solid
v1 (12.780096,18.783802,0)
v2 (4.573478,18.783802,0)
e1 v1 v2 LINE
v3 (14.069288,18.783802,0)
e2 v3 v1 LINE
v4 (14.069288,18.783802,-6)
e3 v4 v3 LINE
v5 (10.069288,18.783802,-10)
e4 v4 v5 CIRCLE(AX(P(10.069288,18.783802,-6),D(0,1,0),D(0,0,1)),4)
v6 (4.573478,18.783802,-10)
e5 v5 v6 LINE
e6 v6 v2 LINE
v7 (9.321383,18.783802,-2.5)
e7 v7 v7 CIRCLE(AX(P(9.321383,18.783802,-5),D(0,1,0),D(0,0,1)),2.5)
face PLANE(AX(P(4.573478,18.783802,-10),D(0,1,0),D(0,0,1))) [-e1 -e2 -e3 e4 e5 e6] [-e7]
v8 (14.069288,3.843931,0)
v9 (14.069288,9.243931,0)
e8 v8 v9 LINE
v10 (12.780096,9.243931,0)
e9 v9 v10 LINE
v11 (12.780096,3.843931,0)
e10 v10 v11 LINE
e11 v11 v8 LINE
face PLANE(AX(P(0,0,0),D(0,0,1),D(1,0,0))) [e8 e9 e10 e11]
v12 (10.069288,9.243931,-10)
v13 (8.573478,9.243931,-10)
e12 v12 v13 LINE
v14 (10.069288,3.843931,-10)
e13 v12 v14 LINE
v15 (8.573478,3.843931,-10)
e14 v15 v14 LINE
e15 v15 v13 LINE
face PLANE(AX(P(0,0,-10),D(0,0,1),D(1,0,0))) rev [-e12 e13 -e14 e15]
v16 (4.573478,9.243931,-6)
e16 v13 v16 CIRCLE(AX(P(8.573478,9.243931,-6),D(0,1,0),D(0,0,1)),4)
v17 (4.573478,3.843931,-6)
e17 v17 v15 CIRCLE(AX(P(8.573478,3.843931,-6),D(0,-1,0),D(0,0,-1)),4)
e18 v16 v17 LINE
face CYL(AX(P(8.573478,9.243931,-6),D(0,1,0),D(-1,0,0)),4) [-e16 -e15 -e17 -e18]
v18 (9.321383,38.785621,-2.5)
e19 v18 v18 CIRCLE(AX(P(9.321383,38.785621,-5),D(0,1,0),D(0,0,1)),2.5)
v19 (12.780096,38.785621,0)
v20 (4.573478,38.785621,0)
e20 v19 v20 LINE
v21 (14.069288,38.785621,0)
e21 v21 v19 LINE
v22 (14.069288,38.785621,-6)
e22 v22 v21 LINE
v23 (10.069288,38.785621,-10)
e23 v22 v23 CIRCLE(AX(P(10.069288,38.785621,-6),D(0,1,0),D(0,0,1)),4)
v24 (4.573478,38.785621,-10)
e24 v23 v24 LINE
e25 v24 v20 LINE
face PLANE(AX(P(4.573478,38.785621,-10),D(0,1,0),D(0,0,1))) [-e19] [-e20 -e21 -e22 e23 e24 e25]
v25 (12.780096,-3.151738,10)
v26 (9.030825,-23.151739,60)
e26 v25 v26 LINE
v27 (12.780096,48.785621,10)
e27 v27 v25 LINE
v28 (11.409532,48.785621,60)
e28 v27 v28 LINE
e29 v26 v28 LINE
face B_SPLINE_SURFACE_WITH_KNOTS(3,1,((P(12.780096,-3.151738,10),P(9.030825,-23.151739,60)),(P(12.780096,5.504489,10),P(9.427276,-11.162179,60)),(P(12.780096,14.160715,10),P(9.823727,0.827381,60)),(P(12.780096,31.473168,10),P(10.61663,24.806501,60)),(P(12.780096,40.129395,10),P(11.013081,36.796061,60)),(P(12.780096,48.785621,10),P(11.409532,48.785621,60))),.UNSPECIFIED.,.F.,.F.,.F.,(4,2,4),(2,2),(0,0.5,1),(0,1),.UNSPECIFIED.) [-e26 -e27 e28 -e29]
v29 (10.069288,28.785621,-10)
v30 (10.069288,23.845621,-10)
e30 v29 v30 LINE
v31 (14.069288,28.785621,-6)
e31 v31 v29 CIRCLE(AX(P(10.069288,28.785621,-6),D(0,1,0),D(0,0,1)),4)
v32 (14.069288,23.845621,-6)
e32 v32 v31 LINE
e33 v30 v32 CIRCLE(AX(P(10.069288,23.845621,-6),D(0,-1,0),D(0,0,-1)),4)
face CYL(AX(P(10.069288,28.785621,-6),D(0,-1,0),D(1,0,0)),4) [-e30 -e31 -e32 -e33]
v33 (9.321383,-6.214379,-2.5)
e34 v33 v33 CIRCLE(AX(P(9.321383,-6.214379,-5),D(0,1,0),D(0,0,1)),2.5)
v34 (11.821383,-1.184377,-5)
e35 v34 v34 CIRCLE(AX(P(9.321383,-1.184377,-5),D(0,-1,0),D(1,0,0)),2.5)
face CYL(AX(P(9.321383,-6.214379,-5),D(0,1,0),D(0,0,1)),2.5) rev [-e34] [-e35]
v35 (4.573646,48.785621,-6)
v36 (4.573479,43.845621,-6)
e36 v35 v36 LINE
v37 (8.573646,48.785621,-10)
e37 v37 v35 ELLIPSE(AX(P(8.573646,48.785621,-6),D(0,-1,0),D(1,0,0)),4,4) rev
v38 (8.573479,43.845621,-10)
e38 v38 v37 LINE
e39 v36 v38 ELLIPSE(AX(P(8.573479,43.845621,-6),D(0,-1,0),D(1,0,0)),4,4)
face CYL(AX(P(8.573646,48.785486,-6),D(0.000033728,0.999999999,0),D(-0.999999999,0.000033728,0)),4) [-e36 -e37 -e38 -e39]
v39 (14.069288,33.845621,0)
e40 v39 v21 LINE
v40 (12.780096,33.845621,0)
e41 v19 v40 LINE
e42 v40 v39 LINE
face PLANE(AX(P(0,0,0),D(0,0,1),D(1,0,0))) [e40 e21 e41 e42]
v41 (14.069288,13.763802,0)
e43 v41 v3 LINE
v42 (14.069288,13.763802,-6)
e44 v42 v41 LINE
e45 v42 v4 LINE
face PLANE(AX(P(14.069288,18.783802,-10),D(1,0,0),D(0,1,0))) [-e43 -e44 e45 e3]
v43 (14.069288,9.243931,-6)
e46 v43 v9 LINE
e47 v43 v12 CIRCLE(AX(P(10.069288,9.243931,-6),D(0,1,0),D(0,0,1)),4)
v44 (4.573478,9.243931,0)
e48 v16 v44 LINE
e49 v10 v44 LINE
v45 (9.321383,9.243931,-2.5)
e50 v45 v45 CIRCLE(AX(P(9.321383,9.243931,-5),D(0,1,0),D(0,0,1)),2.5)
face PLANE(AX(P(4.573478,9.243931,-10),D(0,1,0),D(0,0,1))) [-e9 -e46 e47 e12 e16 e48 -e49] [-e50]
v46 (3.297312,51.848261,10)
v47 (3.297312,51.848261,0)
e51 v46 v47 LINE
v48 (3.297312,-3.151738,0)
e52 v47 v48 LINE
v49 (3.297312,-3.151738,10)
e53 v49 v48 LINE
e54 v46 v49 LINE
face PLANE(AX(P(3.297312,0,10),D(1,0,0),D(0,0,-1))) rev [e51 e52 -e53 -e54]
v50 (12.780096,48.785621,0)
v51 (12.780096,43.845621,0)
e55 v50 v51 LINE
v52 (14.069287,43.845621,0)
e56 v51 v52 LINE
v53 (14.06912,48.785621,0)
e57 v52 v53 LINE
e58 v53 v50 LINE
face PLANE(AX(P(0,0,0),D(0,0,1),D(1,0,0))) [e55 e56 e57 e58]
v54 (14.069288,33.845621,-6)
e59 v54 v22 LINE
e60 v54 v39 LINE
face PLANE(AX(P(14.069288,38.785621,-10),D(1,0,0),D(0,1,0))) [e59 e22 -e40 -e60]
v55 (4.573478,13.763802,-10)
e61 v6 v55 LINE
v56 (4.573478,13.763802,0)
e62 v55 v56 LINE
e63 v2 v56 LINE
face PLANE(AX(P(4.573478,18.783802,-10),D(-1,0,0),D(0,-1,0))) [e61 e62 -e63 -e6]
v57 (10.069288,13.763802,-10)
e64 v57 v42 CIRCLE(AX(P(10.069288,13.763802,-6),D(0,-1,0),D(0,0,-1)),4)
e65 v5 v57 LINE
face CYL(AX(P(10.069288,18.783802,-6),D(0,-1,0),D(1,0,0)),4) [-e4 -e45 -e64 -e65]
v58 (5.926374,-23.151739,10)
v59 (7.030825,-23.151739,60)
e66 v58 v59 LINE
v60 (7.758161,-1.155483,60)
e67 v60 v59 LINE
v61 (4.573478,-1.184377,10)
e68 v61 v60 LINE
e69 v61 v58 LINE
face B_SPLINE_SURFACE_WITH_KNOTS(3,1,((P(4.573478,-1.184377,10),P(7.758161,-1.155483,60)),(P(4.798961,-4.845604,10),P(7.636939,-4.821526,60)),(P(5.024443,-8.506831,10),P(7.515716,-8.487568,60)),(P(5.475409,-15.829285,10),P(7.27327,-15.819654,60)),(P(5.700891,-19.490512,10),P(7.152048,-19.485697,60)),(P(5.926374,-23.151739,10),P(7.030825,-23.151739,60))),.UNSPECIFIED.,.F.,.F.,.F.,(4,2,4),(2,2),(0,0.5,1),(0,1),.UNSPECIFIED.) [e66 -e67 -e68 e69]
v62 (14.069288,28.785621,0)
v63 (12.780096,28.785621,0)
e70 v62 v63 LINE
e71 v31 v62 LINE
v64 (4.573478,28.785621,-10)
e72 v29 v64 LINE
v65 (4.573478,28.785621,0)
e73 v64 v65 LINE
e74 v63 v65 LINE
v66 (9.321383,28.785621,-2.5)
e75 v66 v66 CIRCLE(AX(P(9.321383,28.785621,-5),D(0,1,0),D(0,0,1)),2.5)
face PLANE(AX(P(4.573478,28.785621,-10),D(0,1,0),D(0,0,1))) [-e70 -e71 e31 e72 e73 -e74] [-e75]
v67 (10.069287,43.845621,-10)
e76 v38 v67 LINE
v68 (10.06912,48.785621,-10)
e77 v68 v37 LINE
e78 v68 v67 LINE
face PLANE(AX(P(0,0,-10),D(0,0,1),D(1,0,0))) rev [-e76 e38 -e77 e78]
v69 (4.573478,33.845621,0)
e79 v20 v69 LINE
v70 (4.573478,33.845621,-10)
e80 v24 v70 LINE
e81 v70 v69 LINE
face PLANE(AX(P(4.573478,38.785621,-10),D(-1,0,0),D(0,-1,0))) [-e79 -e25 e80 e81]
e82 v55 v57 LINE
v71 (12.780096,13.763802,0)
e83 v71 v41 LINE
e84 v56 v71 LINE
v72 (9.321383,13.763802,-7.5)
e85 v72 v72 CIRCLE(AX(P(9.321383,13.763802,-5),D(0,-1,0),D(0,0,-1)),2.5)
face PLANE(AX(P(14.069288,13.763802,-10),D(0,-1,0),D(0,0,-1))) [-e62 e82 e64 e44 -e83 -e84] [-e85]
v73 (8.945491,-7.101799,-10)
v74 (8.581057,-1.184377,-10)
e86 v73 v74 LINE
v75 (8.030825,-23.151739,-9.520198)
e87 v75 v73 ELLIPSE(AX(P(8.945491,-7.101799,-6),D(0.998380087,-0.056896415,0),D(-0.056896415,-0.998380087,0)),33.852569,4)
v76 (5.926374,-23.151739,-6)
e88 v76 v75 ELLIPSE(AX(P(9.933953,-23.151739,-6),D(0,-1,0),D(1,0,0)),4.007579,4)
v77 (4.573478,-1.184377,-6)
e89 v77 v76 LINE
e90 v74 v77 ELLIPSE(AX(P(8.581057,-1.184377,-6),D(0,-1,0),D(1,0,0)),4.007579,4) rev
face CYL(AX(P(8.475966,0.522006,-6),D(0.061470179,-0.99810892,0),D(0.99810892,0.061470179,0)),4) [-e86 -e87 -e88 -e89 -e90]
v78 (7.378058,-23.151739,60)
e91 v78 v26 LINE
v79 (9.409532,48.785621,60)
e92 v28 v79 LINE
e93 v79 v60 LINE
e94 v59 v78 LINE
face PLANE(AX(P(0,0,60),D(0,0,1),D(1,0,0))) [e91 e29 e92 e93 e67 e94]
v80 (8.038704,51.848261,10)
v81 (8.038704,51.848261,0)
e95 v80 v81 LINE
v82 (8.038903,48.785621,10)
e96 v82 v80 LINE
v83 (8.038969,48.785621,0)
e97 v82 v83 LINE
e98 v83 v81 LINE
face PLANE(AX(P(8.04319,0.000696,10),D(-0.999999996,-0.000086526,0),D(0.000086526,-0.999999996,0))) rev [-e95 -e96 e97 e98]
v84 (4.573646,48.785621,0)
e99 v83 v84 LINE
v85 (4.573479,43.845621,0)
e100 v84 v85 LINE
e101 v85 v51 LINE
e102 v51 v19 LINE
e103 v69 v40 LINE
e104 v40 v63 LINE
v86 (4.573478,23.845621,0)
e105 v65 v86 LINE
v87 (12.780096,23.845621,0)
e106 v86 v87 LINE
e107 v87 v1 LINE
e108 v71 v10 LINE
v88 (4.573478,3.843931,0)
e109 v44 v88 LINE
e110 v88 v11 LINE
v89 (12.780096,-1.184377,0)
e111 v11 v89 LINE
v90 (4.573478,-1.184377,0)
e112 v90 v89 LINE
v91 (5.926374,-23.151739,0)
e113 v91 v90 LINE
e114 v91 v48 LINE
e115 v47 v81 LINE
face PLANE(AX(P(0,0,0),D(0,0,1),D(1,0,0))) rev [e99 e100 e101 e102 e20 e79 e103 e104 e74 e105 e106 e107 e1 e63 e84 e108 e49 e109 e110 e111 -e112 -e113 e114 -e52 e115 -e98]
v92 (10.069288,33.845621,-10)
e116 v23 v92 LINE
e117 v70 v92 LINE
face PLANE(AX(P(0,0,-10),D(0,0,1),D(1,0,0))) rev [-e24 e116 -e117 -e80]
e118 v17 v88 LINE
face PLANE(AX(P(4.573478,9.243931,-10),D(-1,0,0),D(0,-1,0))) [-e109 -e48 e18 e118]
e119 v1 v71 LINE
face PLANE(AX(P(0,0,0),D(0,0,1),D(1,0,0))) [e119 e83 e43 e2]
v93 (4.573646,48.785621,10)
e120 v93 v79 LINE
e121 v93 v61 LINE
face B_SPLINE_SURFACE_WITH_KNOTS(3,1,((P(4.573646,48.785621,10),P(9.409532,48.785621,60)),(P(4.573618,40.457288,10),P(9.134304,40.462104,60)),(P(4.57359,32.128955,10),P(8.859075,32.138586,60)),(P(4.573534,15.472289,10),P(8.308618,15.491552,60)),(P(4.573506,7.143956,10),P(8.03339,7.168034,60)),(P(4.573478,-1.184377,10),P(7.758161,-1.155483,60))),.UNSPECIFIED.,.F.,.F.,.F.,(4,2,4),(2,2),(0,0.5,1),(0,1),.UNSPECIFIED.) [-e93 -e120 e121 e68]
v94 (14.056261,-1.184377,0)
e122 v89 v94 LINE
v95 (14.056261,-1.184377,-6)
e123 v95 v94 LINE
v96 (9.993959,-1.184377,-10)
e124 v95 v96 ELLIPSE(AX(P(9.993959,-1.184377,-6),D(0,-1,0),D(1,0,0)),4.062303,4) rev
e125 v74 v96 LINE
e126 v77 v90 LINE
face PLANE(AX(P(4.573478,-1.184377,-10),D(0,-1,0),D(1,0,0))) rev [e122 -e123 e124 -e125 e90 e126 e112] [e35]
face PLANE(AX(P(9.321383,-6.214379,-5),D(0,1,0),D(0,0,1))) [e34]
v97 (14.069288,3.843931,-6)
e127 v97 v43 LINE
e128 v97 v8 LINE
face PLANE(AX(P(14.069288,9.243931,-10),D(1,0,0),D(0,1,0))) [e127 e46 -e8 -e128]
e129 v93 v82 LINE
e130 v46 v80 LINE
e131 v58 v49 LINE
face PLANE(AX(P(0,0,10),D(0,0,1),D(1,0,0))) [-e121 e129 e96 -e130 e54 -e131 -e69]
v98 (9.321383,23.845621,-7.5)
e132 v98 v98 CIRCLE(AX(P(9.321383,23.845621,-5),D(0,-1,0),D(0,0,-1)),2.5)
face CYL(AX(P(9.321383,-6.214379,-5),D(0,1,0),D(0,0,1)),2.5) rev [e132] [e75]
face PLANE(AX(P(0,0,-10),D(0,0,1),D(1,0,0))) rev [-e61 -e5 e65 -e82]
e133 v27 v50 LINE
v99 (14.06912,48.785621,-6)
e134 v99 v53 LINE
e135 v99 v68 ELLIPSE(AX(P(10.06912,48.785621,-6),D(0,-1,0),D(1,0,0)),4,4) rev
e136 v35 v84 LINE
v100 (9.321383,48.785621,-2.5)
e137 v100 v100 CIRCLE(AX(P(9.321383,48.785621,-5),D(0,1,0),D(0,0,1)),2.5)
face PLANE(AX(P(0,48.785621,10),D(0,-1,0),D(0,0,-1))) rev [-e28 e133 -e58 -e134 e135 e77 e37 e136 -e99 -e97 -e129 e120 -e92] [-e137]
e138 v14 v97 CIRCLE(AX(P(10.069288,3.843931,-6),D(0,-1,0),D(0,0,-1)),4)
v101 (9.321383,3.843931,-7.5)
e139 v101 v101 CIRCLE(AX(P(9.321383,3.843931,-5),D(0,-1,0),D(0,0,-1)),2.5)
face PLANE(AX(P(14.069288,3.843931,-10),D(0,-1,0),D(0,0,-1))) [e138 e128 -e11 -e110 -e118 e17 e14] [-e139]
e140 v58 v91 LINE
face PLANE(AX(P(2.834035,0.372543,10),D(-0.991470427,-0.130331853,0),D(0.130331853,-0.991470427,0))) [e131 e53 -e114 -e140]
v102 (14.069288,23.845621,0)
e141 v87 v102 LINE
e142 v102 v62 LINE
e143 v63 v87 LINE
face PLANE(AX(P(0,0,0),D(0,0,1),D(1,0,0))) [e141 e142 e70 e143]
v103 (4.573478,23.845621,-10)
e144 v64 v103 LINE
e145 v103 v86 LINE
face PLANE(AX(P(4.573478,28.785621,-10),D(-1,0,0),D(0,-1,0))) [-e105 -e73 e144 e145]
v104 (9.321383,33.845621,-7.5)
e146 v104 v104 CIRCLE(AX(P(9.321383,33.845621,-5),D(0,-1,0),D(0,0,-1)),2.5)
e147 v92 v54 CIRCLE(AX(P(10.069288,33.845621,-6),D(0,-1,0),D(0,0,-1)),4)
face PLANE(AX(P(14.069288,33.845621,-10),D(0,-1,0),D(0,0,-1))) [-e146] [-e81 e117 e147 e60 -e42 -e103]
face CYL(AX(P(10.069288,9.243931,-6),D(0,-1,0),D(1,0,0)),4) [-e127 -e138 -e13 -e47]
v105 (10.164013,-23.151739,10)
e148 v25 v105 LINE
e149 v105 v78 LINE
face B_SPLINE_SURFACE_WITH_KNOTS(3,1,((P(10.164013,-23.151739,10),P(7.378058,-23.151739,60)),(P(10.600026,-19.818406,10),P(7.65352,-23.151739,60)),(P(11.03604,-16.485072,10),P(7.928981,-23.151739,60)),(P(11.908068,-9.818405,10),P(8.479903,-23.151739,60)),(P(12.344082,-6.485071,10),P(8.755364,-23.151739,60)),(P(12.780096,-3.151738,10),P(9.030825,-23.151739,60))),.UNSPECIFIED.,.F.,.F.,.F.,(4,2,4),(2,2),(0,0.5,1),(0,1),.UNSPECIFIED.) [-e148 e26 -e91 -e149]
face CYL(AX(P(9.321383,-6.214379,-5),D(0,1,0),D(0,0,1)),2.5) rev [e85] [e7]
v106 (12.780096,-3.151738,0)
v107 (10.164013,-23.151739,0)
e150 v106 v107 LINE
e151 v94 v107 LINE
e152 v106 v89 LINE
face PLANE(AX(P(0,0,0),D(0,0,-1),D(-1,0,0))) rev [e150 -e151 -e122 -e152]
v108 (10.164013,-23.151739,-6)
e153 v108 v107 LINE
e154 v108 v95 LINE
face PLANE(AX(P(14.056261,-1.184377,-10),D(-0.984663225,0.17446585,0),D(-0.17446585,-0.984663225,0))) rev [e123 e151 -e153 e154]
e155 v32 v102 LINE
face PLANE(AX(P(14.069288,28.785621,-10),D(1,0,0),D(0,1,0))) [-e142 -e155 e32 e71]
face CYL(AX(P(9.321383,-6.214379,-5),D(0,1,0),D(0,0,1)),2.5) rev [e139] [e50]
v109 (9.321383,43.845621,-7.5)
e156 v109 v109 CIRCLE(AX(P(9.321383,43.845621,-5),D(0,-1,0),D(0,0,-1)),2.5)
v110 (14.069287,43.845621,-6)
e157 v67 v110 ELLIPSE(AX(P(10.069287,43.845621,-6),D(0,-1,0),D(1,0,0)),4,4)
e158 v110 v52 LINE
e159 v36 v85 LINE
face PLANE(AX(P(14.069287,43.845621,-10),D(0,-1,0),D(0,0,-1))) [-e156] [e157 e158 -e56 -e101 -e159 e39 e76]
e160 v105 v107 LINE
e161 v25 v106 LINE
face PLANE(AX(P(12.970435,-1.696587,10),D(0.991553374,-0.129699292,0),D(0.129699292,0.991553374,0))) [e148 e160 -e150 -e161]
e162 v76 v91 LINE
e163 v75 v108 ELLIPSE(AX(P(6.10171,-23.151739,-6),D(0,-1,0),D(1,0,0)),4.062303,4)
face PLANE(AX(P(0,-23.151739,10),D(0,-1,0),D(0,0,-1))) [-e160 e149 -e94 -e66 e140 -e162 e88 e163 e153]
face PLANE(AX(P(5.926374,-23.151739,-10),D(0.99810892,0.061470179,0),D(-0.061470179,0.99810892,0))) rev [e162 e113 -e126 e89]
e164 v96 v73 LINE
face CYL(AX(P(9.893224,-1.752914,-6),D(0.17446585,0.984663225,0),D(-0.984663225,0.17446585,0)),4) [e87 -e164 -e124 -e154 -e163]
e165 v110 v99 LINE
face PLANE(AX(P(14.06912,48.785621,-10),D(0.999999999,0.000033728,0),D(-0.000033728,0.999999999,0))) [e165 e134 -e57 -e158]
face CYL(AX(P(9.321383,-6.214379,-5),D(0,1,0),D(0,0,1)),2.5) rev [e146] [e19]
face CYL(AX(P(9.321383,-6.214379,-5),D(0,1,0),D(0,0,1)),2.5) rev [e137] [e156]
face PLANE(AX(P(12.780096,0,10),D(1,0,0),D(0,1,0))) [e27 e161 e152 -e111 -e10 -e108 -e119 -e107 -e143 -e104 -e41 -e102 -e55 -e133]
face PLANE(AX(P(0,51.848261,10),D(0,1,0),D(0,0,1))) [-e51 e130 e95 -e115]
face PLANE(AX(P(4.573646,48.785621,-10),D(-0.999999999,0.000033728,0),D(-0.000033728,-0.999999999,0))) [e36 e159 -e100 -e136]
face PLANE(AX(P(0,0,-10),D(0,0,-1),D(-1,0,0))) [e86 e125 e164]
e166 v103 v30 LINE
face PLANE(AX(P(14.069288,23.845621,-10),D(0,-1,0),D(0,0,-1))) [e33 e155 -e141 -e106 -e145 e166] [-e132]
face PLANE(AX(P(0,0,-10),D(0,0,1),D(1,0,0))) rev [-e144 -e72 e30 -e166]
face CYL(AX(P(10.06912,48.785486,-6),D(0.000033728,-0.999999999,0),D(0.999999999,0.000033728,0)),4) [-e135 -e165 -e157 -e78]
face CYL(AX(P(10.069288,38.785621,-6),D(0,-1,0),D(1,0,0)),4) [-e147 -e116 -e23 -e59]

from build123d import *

# Parameters (mm, degrees)
SKETCH1_W             = 9.495809557
SKETCH1_H             = 5.4
BOSS_EXTRUDE1_DEPTH   = 10
SKETCH1_H_2           = 5.02
BOSS_EXTRUDE1_2_DEPTH = 10
SKETCH1_H_3           = 4.94
BOSS_EXTRUDE1_3_DEPTH = 10
BOSS_EXTRUDE1_4_DEPTH = 10
BOSS_EXTRUDE1_5_DEPTH = 10
BOSS_EXTRUDE2_DEPTH   = 10
BOSS_EXTRUDE3_DEPTH   = 10
FILLET1_R             = 4
SKETCH6_R             = 2.5
CUT_EXTRUDE1_DEPTH    = 55


with BuildPart() as part:
    # Sketch1 → Boss-Extrude1 (new body)
    with BuildSketch(Plane.XY):
        with Locations((9.321382843, 6.543931341)):
            Rectangle(SKETCH1_W, SKETCH1_H)
    extrude(amount=-BOSS_EXTRUDE1_DEPTH)



with BuildPart() as body_2:
    # Sketch1 → Boss-Extrude1 2 (new body)
    with BuildSketch(Plane.XY):
        with Locations((9.321382843, 16.273802043)):
            Rectangle(SKETCH1_W, SKETCH1_H_2)
    extrude(amount=-BOSS_EXTRUDE1_2_DEPTH)


with BuildPart() as body_3:
    # Sketch1 → Boss-Extrude1 3 (new body)
    with BuildSketch(Plane.XY):
        with Locations((9.321382843, 26.315620999)):
            Rectangle(SKETCH1_W, SKETCH1_H_3)
    extrude(amount=-BOSS_EXTRUDE1_3_DEPTH)


with BuildPart() as body_4:
    # Sketch1 → Boss-Extrude1 4 (new body)
    with BuildSketch(Plane.XY):
        with Locations((9.321382843, 36.315620999)):
            Rectangle(SKETCH1_W, SKETCH1_H_3)
    extrude(amount=-BOSS_EXTRUDE1_4_DEPTH)


with BuildPart() as body_5:
    # Sketch1 → Boss-Extrude1 5 (new body)
    with BuildSketch(Plane.XY):
        Polygon((4.573645694, 48.785620997), (4.573479076, 43.845621), (14.069286609, 43.845621), (14.069119991, 48.785620997), align=None)
    extrude(amount=-BOSS_EXTRUDE1_5_DEPTH)


with BuildPart() as part_1:
    add(part.part)

    add(body_2.part)  # Boss-Extrude2 merges body 2

    add(body_3.part)  # Boss-Extrude2 merges body 3

    add(body_4.part)  # Boss-Extrude2 merges body 4

    add(body_5.part)  # Boss-Extrude2 merges body 5
    # Boss-Extrude2: read off the stored shape, not the designer's step
    # Boss-Extrude2 outline → Boss-Extrude2 (add)
    with BuildSketch(Plane.XY):
        Polygon((10.164012515, -23.151739204), (12.780095601, -3.151737932), (12.780095601, 48.785620997), (8.038968881, 48.785620997), (8.038703883, 51.848260515), (3.297312166, 51.848260515), (3.297312166, -3.151737932), (5.92637416, -23.151739204), align=None)
    extrude(amount=BOSS_EXTRUDE2_DEPTH)

    # Sketch3 → Boss-Extrude3 (add)
    with BuildSketch(Plane(origin=(0, 0, 0), x_dir=(-1, 0, 0), z_dir=(0, 0, -1))):
        Polygon((-4.573478064, -1.184377448), (-14.056261499, -1.184377448), (-10.164012515, -23.151739204), (-5.92637416, -23.151739204), align=None)
    extrude(amount=BOSS_EXTRUDE3_DEPTH)

    # Fillet1
    # the kernel refuses this fillet: 4 mm, written as the material it takes off along each edge
    with BuildSketch(Plane(origin=(15.800919998, 8.662254805, -10), x_dir=(0, 0, 1), z_dir=(-0.17446584987640118, -0.9846632252841095, 0))) as fillet1_piece_1:
        with BuildLine():
            CenterArc((FILLET1_R, FILLET1_R), FILLET1_R, 180, 90)
            Line((0, FILLET1_R), (0, 0))
            Line((0, 0), (FILLET1_R, 0))
        make_face()
    extrude(amount=42.309517805, mode=Mode.SUBTRACT)
    with BuildSketch(Plane(origin=(6.54107595, -33.132828409, -10), x_dir=(0, 0, 1), z_dir=(-0.06147017908550384, 0.9981089204506671, 0))) as fillet1_piece_2:
        with BuildLine():
            CenterArc((FILLET1_R, FILLET1_R), FILLET1_R, 180, 90)
            Line((0, FILLET1_R), (0, 0))
            Line((0, 0), (FILLET1_R, 0))
        make_face()
    extrude(amount=42.008982493, mode=Mode.SUBTRACT)
    with BuildSketch(Plane(origin=(4.573982978, 58.785620992, -10), x_dir=(0, 0, 1), z_dir=(-3.372835133255536e-05, -0.9999999994311992, 0))) as fillet1_piece_3_section:
        with BuildLine():
            CenterArc((FILLET1_R, -FILLET1_R), FILLET1_R, 90, 90)
            Line((0, -FILLET1_R), (0, 0))
            Line((0, 0), (FILLET1_R, 0))
        make_face()
    fillet1_piece_3 = extrude(amount=24.94, mode=Mode.PRIVATE)
    fillet1_piece_3 = split(fillet1_piece_3, bisect_by=Plane(origin=(4.573982978, 38.785620999, -10), z_dir=(0, 1, 0)), keep=Keep.TOP, mode=Mode.PRIVATE)
    add(fillet1_piece_3, mode=Mode.SUBTRACT)
    with BuildSketch(Plane(origin=(14.069623892, 33.845621006, -10), x_dir=(0, 0, 1), z_dir=(-3.372835144025149e-05, 0.9999999994311992, 0)), Plane(origin=(14.069287621, 23.845620999, -10), x_dir=(0, 0, 1), z_dir=(0, 1, 0)), Plane(origin=(14.069287621, 13.845620999, -10), x_dir=(0, 0, 1), z_dir=(0, 1, 0))) as fillet1_piece_4:
        with BuildLine():
            CenterArc((FILLET1_R, -FILLET1_R), FILLET1_R, 90, 90)
            Line((0, -FILLET1_R), (0, 0))
            Line((0, 0), (FILLET1_R, 0))
        make_face()
    extrude(amount=24.94, mode=Mode.SUBTRACT)
    with BuildSketch(Plane(origin=(14.069287621, 3.763802043, -10), x_dir=(0, 0, 1), z_dir=(0, 1, 0))) as fillet1_piece_5:
        with BuildLine():
            CenterArc((FILLET1_R, -FILLET1_R), FILLET1_R, 90, 90)
            Line((0, -FILLET1_R), (0, 0))
            Line((0, 0), (FILLET1_R, 0))
        make_face()
    extrude(amount=25.02, mode=Mode.SUBTRACT)
    with BuildSketch(Plane(origin=(14.069287621, -6.156068659, -10), x_dir=(-1, 0, 0), z_dir=(0, 1, 0))) as fillet1_piece_6:
        with BuildLine():
            CenterArc((FILLET1_R, FILLET1_R), FILLET1_R, 180, 90)
            Line((0, FILLET1_R), (0, 0))
            Line((0, 0), (FILLET1_R, 0))
        make_face()
    extrude(amount=25.4, mode=Mode.SUBTRACT)
    with BuildSketch(Plane(origin=(4.573478064, 19.243931341, -10), x_dir=(0, 0, 1), z_dir=(0, -1, 0))) as fillet1_piece_7_section:
        with BuildLine():
            CenterArc((FILLET1_R, -FILLET1_R), FILLET1_R, 90, 90)
            Line((0, -FILLET1_R), (0, 0))
            Line((0, 0), (FILLET1_R, 0))
        make_face()
    fillet1_piece_7 = extrude(amount=25.4, mode=Mode.PRIVATE)
    fillet1_piece_7 = split(fillet1_piece_7, bisect_by=Plane(origin=(4.573478064, 13.763802043, -10), z_dir=(0, -1, 0)), keep=Keep.TOP, mode=Mode.PRIVATE)
    add(fillet1_piece_7, mode=Mode.SUBTRACT)

    # Loft2: read off the stored shape, not the designer's step
    # Loft2: loft between two sections, ruled curve by curve
    loft2_from = [
        Edge.make_bspline([(12.780095601, -3.151737932, 10), (12.780095601, 5.504488557, 10), (12.780095601, 14.160715045, 10), (12.780095601, 31.473168021, 10), (12.780095601, 40.129394509, 10), (12.780095601, 48.785620997, 10)], [0, 0, 0, 0, 0.5, 0.5, 1, 1, 1, 1], 3),
        Edge.make_bspline([(4.573645694, 48.785620997, 10), (4.573617756, 40.457287923, 10), (4.573589817, 32.128954849, 10), (4.573533941, 15.472288701, 10), (4.573506003, 7.143955626, 10), (4.573478064, -1.184377448, 10)], [0, 0, 0, 0, 0.5, 0.5, 1, 1, 1, 1], 3),
        Edge.make_bspline([(4.573478064, -1.184377448, 10), (4.798960747, -4.845604407, 10), (5.024443429, -8.506831367, 10), (5.475408794, -15.829285285, 10), (5.700891477, -19.490512245, 10), (5.92637416, -23.151739204, 10)], [0, 0, 0, 0, 0.5, 0.5, 1, 1, 1, 1], 3),
        Edge.make_bspline([(10.164012515, -23.151739204, 10), (10.600026362, -19.818405659, 10), (11.03604021, -16.485072113, 10), (11.908067905, -9.818405022, 10), (12.344081753, -6.485071477, 10), (12.780095601, -3.151737932, 10)], [0, 0, 0, 0, 0.5, 0.5, 1, 1, 1, 1], 3),
        Edge.make_line((10.164012515, -23.151739204, 10), (5.92637416, -23.151739204, 10)),
        Edge.make_line((4.573645694, 48.785620997, 10), (12.780095601, 48.785620997, 10)),
    ]
    loft2_to = [
        Edge.make_bspline([(9.030825072, -23.151739204, 60), (9.427276266, -11.162179171, 60), (9.823727461, 0.827380863, 60), (10.616629851, 24.80650093, 60), (11.013081046, 36.796060964, 60), (11.409532241, 48.785620997, 60)], [0, 0, 0, 0, 0.5, 0.5, 1, 1, 1, 1], 3),
        Edge.make_bspline([(9.409532241, 48.785620997, 60), (9.13430376, 40.462103653, 60), (8.859075279, 32.138586309, 60), (8.308618317, 15.491551622, 60), (8.033389836, 7.168034278, 60), (7.758161355, -1.155483066, 60)], [0, 0, 0, 0, 0.5, 0.5, 1, 1, 1, 1], 3),
        Edge.make_bspline([(7.758161355, -1.155483066, 60), (7.636938641, -4.821525756, 60), (7.515715927, -8.487568446, 60), (7.273270499, -15.819653825, 60), (7.152047785, -19.485696515, 60), (7.030825072, -23.151739204, 60)], [0, 0, 0, 0, 0.5, 0.5, 1, 1, 1, 1], 3),
        Edge.make_bspline([(7.378058471, -23.151739204, 60), (7.653519571, -23.151739204, 60), (7.928980671, -23.151739204, 60), (8.479902871, -23.151739204, 60), (8.755363971, -23.151739204, 60), (9.030825072, -23.151739204, 60)], [0, 0, 0, 0, 0.5, 0.5, 1, 1, 1, 1], 3),
        Edge.make_line((7.378058471, -23.151739204, 60), (7.030825072, -23.151739204, 60)),
        Edge.make_line((9.409532241, 48.785620997, 60), (11.409532241, 48.785620997, 60)),
    ]
    loft2 = Solid(Shell([*[Face.make_surface_from_curves(loft2_from[k], loft2_to[k]) for k in range(6)], Face(Wire(loft2_from)), Face(Wire(loft2_to))]))
    add(loft2)

    # Sketch6 → Cut-Extrude1 (cut)
    with BuildSketch(Plane(origin=(0, 48.785620997, 0), x_dir=(1, 0, 0), z_dir=(0, 1, 0))):
        with Locations(Location((9.321382843, 5, 0), (0, 0, 270))):
            Circle(SKETCH6_R)
    extrude(amount=-CUT_EXTRUDE1_DEPTH, mode=Mode.SUBTRACT)


solid = part_1.part
